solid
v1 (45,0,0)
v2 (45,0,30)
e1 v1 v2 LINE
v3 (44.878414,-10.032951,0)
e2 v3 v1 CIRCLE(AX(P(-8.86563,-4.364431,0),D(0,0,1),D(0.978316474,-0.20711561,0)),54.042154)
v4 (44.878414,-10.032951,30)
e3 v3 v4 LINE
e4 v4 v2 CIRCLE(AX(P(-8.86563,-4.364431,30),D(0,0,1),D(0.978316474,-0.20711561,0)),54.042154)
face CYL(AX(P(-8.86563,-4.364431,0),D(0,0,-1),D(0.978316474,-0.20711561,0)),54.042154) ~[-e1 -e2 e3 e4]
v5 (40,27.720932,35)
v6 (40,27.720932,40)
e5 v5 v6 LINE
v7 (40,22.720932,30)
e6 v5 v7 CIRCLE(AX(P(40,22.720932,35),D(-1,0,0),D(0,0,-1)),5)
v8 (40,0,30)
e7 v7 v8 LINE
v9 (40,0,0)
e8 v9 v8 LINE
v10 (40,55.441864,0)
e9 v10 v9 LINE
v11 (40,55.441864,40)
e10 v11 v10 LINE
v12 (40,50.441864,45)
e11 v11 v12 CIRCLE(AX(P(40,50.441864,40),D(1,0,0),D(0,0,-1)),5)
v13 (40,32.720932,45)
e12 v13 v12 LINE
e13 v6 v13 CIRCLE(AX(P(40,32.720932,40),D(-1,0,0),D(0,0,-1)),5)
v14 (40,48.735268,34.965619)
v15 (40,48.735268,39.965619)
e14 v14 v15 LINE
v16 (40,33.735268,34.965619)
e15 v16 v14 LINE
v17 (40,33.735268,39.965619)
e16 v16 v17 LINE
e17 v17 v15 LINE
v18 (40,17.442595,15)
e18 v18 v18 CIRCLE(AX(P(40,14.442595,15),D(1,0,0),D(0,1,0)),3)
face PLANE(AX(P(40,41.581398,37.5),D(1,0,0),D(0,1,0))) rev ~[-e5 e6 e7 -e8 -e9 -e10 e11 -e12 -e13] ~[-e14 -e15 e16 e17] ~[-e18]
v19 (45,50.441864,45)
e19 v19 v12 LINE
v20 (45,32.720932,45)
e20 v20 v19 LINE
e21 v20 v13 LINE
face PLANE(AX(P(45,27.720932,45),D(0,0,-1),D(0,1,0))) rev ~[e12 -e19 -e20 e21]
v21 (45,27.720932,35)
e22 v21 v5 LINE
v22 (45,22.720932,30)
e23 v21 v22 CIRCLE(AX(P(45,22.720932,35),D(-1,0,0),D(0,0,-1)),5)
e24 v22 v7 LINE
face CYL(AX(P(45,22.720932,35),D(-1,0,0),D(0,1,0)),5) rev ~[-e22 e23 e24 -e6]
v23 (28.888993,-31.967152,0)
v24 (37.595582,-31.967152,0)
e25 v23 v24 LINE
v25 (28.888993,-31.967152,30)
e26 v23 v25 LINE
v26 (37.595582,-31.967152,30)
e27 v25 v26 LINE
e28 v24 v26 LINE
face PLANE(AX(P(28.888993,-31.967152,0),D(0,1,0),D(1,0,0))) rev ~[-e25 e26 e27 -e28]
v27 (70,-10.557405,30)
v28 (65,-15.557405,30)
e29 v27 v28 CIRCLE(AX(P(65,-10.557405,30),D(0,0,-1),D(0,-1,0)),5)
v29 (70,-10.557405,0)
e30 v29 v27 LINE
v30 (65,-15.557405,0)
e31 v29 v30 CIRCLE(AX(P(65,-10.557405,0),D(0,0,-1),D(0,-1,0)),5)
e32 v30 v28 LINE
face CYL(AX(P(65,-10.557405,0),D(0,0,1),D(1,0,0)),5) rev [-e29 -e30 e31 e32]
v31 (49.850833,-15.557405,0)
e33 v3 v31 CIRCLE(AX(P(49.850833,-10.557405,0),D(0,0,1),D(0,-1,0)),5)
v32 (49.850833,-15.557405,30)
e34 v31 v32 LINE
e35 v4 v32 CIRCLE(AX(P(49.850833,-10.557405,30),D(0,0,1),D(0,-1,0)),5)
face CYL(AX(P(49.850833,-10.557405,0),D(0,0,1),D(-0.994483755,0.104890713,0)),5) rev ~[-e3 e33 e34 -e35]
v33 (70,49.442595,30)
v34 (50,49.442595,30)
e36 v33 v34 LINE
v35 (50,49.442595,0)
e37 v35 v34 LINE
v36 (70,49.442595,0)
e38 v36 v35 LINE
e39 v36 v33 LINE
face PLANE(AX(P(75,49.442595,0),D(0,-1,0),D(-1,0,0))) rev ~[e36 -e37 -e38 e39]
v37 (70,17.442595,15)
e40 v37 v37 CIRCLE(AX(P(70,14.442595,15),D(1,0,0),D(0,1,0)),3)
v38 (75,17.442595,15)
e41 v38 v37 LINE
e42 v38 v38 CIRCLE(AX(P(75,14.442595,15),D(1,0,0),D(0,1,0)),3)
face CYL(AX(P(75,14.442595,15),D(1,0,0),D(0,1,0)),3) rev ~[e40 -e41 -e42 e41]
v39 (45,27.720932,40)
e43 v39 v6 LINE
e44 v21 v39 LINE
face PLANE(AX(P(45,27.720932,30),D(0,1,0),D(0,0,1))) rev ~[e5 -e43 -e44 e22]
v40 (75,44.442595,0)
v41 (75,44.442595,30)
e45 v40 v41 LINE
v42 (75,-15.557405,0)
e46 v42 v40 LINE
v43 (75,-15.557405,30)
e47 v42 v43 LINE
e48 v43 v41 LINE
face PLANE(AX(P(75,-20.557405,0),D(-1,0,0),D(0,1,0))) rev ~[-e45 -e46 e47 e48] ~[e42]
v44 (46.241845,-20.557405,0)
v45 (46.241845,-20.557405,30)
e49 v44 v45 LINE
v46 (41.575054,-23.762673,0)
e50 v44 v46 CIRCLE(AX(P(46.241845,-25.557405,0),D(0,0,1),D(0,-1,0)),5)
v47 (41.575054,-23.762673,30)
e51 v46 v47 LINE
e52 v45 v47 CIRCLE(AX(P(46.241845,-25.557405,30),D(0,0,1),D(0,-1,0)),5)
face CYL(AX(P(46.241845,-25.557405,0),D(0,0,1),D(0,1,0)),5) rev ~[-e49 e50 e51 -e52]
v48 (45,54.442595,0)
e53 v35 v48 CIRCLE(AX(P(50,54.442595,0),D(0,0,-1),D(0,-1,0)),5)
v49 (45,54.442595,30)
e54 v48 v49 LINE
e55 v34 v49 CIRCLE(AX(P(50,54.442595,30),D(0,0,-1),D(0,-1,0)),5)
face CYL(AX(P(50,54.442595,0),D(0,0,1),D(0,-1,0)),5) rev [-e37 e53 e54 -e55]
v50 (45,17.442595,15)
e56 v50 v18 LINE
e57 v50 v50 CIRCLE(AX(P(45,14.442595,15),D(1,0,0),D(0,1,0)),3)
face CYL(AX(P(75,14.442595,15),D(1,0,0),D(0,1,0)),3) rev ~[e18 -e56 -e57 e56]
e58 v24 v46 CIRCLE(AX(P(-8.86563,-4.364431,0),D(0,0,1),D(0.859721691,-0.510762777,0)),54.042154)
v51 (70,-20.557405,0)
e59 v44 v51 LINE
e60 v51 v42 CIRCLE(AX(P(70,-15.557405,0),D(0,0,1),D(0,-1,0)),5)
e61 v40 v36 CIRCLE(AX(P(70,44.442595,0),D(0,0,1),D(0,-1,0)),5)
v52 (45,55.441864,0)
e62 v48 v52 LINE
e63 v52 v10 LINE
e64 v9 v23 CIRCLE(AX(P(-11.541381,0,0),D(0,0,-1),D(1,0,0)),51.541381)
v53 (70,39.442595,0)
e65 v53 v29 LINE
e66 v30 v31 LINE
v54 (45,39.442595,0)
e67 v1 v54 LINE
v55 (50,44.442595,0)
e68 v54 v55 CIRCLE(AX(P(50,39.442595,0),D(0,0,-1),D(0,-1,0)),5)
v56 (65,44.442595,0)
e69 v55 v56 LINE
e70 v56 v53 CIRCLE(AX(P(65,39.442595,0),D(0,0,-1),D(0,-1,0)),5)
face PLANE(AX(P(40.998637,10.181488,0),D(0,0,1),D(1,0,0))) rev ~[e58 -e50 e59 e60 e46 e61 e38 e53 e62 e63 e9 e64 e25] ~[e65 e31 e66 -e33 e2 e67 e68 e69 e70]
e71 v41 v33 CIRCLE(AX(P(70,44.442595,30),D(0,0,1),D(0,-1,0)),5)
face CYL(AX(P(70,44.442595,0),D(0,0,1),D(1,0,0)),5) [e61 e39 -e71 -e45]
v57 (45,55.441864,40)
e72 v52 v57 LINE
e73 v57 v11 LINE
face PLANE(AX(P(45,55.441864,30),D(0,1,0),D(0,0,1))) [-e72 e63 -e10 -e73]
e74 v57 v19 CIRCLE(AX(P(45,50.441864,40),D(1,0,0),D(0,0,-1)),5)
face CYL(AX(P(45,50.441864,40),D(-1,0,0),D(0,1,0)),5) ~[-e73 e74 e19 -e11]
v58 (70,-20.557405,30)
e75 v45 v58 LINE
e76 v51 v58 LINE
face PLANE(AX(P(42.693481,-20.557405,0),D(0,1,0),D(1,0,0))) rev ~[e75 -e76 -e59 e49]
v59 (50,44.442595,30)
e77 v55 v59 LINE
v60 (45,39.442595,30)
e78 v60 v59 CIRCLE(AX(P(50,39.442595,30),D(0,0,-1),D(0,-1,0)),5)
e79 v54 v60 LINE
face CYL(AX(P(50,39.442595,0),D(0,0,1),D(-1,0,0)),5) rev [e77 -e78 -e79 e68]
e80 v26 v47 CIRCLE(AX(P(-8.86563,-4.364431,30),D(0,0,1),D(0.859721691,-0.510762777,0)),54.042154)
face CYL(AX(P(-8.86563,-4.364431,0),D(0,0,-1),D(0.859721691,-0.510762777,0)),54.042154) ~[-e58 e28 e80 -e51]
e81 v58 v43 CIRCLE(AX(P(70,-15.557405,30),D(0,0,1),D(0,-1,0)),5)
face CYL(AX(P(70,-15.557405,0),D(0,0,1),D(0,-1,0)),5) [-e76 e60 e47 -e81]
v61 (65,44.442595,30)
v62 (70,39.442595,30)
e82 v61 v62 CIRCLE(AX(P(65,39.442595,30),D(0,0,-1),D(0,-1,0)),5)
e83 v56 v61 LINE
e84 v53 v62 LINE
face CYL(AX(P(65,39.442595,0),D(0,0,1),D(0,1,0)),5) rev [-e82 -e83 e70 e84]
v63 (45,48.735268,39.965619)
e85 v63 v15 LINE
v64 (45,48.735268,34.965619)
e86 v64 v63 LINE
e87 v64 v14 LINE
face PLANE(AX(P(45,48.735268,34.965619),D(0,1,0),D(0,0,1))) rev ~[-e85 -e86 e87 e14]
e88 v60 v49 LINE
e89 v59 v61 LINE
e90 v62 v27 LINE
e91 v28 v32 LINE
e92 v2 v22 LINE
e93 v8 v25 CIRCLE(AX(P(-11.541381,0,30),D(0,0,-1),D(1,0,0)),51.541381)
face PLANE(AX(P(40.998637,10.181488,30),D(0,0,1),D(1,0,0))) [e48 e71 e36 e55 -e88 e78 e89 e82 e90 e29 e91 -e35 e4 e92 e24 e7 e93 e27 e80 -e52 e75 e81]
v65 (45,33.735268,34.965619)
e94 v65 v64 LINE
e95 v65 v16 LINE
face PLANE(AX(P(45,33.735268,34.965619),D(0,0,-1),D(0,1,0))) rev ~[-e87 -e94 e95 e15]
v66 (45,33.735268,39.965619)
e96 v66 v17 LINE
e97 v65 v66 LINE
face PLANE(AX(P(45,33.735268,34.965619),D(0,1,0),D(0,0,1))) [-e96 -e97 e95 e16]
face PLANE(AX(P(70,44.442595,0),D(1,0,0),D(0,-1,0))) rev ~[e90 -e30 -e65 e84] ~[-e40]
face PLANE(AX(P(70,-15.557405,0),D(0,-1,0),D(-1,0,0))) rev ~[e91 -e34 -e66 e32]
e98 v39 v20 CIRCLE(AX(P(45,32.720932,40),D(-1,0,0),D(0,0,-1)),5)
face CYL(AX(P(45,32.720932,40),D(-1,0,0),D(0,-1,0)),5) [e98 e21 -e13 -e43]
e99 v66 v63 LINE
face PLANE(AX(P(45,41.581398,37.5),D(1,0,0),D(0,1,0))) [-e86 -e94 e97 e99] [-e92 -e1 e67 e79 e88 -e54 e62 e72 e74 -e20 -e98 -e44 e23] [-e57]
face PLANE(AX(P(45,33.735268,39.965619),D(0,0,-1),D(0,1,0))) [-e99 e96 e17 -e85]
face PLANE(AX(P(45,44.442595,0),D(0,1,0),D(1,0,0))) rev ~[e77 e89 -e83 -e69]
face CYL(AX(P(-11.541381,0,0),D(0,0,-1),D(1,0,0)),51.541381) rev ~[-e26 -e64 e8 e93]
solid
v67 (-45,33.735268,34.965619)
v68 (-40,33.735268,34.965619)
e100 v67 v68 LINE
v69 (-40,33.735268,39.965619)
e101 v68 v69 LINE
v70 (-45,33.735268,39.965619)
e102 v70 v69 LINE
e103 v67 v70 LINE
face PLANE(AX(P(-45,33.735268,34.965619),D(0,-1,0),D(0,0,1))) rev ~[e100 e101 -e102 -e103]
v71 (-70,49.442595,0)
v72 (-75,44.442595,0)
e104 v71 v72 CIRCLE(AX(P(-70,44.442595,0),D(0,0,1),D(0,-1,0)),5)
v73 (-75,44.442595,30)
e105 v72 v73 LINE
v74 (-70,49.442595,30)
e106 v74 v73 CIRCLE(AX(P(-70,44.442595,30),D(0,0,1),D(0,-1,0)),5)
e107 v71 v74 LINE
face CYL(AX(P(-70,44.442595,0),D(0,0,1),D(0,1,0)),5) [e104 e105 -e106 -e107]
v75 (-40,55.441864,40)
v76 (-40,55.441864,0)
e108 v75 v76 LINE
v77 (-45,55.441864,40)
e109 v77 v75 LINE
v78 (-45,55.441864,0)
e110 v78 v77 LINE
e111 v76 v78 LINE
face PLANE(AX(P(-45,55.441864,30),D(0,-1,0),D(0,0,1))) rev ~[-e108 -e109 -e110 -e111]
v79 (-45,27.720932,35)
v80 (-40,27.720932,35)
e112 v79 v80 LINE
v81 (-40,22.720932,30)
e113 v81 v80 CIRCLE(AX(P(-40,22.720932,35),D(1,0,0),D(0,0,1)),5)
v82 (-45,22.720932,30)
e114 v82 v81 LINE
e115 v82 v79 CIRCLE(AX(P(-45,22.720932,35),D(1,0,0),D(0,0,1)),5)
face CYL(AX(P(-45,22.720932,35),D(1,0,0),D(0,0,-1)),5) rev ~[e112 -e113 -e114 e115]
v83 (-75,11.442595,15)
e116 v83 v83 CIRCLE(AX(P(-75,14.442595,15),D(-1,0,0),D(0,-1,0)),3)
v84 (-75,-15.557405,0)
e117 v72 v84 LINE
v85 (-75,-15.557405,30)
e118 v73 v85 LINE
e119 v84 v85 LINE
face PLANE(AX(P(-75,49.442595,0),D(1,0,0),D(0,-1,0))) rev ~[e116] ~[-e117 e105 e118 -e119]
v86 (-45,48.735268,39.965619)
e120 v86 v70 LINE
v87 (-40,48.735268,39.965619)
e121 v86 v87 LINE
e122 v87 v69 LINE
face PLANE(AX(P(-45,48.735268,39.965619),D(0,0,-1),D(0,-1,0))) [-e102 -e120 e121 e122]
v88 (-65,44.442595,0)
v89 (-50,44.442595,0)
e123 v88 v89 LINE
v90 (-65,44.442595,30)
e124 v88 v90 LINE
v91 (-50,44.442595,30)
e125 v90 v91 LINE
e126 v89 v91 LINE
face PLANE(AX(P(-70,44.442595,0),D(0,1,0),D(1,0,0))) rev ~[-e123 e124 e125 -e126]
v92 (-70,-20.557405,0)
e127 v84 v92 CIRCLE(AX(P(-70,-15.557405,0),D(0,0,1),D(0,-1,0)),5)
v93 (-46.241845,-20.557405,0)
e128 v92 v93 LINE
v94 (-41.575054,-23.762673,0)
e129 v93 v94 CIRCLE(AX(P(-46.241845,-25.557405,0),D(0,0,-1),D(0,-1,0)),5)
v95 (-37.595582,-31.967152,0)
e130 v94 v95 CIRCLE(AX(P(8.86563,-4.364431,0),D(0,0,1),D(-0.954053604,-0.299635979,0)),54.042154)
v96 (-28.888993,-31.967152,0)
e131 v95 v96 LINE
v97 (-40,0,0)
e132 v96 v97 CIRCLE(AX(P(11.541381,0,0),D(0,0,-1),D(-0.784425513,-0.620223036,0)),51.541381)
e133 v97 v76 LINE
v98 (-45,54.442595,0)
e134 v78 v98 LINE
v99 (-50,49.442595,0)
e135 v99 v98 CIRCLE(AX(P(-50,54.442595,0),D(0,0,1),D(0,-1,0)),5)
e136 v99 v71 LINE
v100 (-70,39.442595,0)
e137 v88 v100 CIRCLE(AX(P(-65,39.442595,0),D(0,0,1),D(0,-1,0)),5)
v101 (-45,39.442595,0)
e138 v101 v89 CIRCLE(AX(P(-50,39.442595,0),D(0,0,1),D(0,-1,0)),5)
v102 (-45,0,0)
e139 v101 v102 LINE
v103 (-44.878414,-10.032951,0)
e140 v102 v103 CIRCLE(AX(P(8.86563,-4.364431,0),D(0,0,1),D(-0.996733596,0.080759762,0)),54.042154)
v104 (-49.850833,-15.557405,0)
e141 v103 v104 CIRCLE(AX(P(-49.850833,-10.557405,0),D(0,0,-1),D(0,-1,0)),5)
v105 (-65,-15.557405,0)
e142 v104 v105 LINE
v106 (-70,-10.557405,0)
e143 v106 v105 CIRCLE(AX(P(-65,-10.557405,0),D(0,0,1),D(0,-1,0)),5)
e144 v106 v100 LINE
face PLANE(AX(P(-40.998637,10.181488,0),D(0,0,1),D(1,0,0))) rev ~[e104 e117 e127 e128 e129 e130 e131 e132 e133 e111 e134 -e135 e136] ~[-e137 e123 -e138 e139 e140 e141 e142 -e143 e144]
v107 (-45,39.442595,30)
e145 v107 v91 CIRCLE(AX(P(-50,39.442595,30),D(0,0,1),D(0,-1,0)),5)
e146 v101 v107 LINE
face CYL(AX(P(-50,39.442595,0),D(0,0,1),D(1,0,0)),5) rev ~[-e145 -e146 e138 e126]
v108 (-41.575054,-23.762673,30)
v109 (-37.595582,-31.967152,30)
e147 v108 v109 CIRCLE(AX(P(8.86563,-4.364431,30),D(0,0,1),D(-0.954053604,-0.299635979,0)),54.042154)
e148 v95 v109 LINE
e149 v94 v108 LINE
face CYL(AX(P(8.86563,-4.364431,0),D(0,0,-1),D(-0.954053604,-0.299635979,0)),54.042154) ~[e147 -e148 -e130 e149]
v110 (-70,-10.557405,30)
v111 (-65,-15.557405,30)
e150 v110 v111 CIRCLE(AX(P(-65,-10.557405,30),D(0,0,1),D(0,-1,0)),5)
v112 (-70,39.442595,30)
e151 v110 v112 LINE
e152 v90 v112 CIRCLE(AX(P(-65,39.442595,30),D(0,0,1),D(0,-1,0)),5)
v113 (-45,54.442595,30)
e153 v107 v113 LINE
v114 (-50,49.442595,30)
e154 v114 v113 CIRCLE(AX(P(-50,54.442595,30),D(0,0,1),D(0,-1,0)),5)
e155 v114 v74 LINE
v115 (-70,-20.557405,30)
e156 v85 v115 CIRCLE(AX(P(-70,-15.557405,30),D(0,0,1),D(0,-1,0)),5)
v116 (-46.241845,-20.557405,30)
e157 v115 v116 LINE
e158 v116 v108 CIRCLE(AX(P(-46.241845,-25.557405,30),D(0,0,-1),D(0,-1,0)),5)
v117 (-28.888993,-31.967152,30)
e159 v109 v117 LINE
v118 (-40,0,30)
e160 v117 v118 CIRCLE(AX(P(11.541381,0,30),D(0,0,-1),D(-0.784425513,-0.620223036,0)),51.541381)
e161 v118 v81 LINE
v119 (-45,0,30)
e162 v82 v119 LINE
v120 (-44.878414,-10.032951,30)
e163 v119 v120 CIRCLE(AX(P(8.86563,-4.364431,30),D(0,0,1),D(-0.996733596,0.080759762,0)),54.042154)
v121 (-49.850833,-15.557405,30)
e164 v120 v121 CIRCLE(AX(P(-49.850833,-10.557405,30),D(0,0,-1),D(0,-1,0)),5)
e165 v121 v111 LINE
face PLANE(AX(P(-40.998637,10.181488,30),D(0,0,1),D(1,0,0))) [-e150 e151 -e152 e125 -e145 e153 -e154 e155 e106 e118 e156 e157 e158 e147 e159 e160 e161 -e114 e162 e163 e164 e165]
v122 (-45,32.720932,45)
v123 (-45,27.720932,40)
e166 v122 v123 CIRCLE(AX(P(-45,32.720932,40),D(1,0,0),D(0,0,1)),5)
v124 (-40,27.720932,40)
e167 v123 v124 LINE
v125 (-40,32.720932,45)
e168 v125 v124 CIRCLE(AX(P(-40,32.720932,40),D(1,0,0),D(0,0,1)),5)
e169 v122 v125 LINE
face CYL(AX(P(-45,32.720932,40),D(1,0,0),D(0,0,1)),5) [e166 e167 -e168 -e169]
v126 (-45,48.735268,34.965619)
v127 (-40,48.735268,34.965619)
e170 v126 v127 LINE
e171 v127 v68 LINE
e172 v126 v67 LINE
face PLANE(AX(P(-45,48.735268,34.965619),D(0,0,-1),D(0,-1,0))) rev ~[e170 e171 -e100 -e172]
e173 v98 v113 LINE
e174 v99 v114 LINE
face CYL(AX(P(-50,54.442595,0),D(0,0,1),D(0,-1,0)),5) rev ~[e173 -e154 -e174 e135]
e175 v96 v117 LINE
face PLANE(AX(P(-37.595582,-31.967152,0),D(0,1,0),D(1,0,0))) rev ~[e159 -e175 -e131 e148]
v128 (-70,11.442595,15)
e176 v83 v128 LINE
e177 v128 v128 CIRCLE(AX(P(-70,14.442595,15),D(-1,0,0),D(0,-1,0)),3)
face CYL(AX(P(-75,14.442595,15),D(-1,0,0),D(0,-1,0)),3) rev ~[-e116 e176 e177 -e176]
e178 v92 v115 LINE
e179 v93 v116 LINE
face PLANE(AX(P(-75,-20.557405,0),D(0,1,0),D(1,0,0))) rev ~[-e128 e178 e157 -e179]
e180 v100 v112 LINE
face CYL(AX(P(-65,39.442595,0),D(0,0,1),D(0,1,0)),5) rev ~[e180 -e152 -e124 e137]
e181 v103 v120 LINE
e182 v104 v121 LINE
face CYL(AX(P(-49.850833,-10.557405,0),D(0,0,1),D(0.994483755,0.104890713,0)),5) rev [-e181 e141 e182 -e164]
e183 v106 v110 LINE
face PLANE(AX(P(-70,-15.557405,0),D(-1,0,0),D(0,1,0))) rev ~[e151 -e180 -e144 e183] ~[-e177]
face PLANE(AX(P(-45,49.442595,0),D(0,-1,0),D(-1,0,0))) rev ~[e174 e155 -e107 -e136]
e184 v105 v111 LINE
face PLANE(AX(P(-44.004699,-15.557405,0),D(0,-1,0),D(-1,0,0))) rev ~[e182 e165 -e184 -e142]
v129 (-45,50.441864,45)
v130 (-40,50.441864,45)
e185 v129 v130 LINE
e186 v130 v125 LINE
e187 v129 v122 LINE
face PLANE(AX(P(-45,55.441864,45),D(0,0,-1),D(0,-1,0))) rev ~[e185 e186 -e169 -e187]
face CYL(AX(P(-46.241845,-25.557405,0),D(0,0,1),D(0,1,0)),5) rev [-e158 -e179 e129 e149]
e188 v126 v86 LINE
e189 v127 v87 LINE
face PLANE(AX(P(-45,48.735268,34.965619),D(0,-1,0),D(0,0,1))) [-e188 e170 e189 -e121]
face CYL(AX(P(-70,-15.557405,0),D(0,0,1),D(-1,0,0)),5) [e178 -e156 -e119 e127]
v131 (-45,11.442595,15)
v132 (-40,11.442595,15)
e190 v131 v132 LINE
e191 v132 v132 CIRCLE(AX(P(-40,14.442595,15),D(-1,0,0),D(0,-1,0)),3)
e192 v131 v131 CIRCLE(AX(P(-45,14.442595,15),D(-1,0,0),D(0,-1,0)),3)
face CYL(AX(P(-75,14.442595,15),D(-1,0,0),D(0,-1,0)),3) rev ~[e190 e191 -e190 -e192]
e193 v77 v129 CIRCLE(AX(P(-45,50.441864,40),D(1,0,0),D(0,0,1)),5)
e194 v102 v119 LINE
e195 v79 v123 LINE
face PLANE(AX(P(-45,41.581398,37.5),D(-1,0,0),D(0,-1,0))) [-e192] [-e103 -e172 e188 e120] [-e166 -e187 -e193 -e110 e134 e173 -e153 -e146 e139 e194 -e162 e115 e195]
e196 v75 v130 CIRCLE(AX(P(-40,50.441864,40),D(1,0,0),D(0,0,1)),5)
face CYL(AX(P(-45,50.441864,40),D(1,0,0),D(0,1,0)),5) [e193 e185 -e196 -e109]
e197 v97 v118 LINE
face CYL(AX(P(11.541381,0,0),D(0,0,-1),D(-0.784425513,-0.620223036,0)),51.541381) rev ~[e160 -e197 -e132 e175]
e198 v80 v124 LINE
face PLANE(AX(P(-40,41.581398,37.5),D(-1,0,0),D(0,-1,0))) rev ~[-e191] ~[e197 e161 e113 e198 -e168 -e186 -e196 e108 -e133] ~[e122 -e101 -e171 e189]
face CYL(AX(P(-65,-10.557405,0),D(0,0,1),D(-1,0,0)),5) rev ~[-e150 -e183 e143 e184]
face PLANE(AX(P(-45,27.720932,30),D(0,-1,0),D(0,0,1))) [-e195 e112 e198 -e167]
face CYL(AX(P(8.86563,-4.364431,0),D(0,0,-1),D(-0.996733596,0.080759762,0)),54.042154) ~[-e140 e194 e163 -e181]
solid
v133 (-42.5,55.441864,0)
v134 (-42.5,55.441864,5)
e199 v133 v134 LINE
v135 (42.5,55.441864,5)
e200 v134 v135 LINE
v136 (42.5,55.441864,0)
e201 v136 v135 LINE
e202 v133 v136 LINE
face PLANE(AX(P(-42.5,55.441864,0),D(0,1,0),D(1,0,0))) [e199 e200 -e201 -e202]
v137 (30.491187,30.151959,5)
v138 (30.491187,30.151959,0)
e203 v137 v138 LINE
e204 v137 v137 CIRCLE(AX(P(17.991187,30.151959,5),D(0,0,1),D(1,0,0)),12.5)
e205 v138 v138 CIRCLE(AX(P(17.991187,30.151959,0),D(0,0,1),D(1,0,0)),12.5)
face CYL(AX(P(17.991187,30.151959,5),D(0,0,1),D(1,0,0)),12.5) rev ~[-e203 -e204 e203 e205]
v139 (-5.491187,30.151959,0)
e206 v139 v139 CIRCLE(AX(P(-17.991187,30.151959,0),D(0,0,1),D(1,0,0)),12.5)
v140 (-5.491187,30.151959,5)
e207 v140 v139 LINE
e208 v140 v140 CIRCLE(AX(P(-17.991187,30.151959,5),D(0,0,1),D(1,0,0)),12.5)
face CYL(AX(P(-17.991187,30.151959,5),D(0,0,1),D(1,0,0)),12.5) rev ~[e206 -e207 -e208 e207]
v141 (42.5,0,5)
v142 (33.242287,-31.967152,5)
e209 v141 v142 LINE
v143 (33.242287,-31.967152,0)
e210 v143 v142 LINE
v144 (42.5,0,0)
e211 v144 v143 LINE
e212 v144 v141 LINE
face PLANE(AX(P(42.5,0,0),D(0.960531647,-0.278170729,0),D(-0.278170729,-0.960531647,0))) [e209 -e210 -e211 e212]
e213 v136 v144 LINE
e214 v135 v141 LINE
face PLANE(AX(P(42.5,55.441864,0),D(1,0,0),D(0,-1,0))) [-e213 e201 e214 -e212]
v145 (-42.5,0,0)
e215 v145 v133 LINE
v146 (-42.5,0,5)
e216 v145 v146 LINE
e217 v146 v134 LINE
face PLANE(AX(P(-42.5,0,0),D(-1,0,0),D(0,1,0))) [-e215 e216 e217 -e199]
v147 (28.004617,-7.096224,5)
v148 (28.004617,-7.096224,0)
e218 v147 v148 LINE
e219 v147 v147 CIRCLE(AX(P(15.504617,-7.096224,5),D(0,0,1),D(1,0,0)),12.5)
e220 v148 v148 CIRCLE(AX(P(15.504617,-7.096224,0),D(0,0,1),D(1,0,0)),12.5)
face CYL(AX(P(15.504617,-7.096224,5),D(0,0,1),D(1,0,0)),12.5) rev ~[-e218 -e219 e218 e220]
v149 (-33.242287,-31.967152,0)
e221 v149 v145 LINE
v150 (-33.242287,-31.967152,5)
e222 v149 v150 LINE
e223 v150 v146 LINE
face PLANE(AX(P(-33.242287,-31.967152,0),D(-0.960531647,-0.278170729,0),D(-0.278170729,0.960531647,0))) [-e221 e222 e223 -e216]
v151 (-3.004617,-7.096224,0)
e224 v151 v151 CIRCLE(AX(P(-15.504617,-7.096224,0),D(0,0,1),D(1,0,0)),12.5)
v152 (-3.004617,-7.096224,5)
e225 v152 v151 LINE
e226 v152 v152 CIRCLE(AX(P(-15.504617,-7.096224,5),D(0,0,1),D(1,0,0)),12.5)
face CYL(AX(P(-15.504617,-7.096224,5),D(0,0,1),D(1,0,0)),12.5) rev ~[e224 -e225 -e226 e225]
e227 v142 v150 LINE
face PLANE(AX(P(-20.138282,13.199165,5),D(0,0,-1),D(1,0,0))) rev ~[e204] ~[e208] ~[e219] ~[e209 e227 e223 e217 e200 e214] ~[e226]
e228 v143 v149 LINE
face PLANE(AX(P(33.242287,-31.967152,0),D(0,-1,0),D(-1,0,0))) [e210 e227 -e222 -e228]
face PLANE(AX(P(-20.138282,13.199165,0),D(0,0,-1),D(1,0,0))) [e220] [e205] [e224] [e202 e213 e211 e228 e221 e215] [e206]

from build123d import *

# Parameters (mm, degrees)
F1_DEPTH  = 30
F3_DEPTH  = 5
F4_R      = 3
F5_DEPTH  = 35
F6_R      = 3
F7_DEPTH  = 35
F9_W      = 27.7209319142
F9_H      = 15
F9_W_2    = 15
F9_H_2    = 5
F10_DEPTH = 5
F11_R     = 5
F12_R     = 5
F13_R     = 5
F13_2_R   = 5
F14_R     = 5
F15_W     = 27.7209319142
F15_H     = 15
F15_W_2   = 15
F15_H_2   = 5
F16_DEPTH = 5
F17_R     = 5
F18_R     = 12.5
F19_DEPTH = 5


with BuildPart() as f1:
    # F0 (on Top) → F1 (new body)
    with BuildSketch(Plane.XY):
        with BuildLine():
            Line((-45, 44.4425949542), (-45, 0))
            ThreePointArc((-45, 0), (-45.066266446, -7.8147796829), (-44.0046991035, -15.5574050458))
            ThreePointArc((-44.0046991035, -15.5574050458), (-43.4089049923, -18.0730910814), (-42.6934813561, -20.5574050458))
            ThreePointArc((-42.6934813561, -20.5574050458), (-40.475443237, -26.4101305765), (-37.5955815851, -31.9671519101))
            Line((-37.5955815851, -31.9671519101), (-28.8889932035, -31.9671519101))
            ThreePointArc((-28.8889932035, -31.9671519101), (-37.1430686541, -16.9215341597), (-40, 0))
            Line((-40, 0), (-40, 55.4418638284))
            Line((-40, 55.4418638284), (-45, 55.4418638284))
            Line((-45, 55.4418638284), (-45, 49.4425949542))
            Line((-45, 49.4425949542), (-45, 44.4425949542))
        make_face()
        with BuildLine():
            ThreePointArc((-42.6934813561, -20.5574050458), (-43.4089049923, -18.0730910814), (-44.0046991035, -15.5574050458))
            Line((-44.0046991035, -15.5574050458), (-70, -15.5574050458))
            Line((-70, -15.5574050458), (-70, 44.4425949542))
            Line((-70, 44.4425949542), (-45, 44.4425949542))
            Line((-45, 44.4425949542), (-45, 49.4425949542))
            Line((-45, 49.4425949542), (-75, 49.4425949542))
            Line((-75, 49.4425949542), (-75, -20.5574050458))
            Line((-75, -20.5574050458), (-42.6934813561, -20.5574050458))
        make_face()
    extrude(amount=F1_DEPTH)

    # F6 (on face) → F7 (cut)
    with BuildSketch(Plane(origin=(-75, 0, 0), x_dir=(0, -1, 0), z_dir=(-1, 0, 0))):
        with Locations((-14.4425949542, 15)):
            Circle(F6_R)
    extrude(amount=-F7_DEPTH, mode=Mode.SUBTRACT)

    # F9 (on face) → F10 (join)
    with BuildSketch(Plane(origin=(-45, 0, 0), x_dir=(0, -1, 0), z_dir=(-1, 0, 0))):
        with Locations((-41.5813978713, 37.5)):
            Rectangle(F9_W, F9_H)
        with Locations((-41.235268414, 37.4656194448)):
            Rectangle(F9_W_2, F9_H_2, mode=Mode.SUBTRACT)
    extrude(amount=-F10_DEPTH)

    # F11
    f11_edges = [f1.edges().sort_by_distance(p)[0] for p in [
        (-75, 49.442595, 15),
        (-75, -20.557405, 15),
    ]]
    fillet(f11_edges, radius=F11_R)

    # F13
    f13_edges = [f1.edges().sort_by_distance(p)[0] for p in [
        (-70, 44.442595, 15),
        (-70, -15.557405, 15),
        (-45, 44.442595, 15),
        (-44.004699, -15.557405, 15),
        (-42.693481, -20.557405, 15),
        (-45, 49.442595, 15),
        (-42.5, 27.720932, 30),
    ]]
    fillet(f13_edges, radius=F13_R)

    # F14
    f14_edges = [f1.edges().sort_by_distance(p)[0] for p in [
        (-42.5, 55.441864, 45),
        (-42.5, 27.720932, 45),
    ]]
    fillet(f14_edges, radius=F14_R)


with BuildPart() as f1b:
    # F0 (on Top) → F1, piece 2 (new body)
    with BuildSketch(Plane.XY):
        with BuildLine():
            ThreePointArc((44.0046991035, -15.5574050458), (45.066266446, -7.8147796829), (45, 0))
            Line((45, 0), (45, 44.4425949542))
            Line((45, 44.4425949542), (45, 49.4425949542))
            Line((45, 49.4425949542), (45, 55.4418638284))
            Line((45, 55.4418638284), (40, 55.4418638284))
            Line((40, 55.4418638284), (40, 0))
            ThreePointArc((40, 0), (37.1430686541, -16.9215341597), (28.8889932035, -31.9671519101))
            Line((28.8889932035, -31.9671519101), (37.5955815851, -31.9671519101))
            ThreePointArc((37.5955815851, -31.9671519101), (40.475443237, -26.4101305765), (42.6934813561, -20.5574050458))
            ThreePointArc((42.6934813561, -20.5574050458), (43.4089049923, -18.0730910814), (44.0046991035, -15.5574050458))
        make_face()
        with BuildLine():
            Line((45, 49.4425949542), (45, 44.4425949542))
            Line((45, 44.4425949542), (70, 44.4425949542))
            Line((70, 44.4425949542), (70, -15.5574050458))
            Line((70, -15.5574050458), (44.0046991035, -15.5574050458))
            ThreePointArc((44.0046991035, -15.5574050458), (43.4089049923, -18.0730910814), (42.6934813561, -20.5574050458))
            Line((42.6934813561, -20.5574050458), (75, -20.5574050458))
            Line((75, -20.5574050458), (75, 49.4425949542))
            Line((75, 49.4425949542), (45, 49.4425949542))
        make_face()
    extrude(amount=F1_DEPTH)

    # F4 (on face) → F5 (cut)
    with BuildSketch(Plane.YZ.offset(75)):
        with Locations((14.4425949542, 15)):
            Circle(F4_R)
    extrude(amount=-F5_DEPTH, mode=Mode.SUBTRACT)

    # F12
    f12_edges = [f1b.edges().sort_by_distance(p)[0] for p in [
        (75, -20.557405, 15),
        (75, 49.442595, 15),
    ]]
    fillet(f12_edges, radius=F12_R)

    # F13#2
    f13_2_edges = [f1b.edges().sort_by_distance(p)[0] for p in [
        (70, 44.442595, 15),
        (70, -15.557405, 15),
        (45, 44.442595, 15),
        (44.004699, -15.557405, 15),
        (42.693481, -20.557405, 15),
        (45, 49.442595, 15),
    ]]
    fillet(f13_2_edges, radius=F13_2_R)

    # F15 (on face) → F16 (join)
    with BuildSketch(Plane.YZ.offset(45)):
        with Locations((41.5813978713, 37.5)):
            Rectangle(F15_W, F15_H)
        with Locations((41.235268414, 37.4656194448)):
            Rectangle(F15_W_2, F15_H_2, mode=Mode.SUBTRACT)
    extrude(amount=-F16_DEPTH)

    # F17
    f17_edges = [f1b.edges().sort_by_distance(p)[0] for p in [
        (42.5, 55.441864, 45),
        (42.5, 27.720932, 45),
        (42.5, 27.720932, 30),
    ]]
    fillet(f17_edges, radius=F17_R)


with BuildPart() as f3:
    # F2 (on face) → F3 (new body)
    with BuildSketch(Plane(origin=(0, 0, 0), x_dir=(1, 0, 0), z_dir=(0, 0, -1))):
        Polygon((-42.5, 0), (-42.5, -55.4418638284), (0, -55.4418638284), (0, 31.9671519101), (-33.2422873943, 31.9671519101), align=None)
        Polygon((0, 31.9671519101), (0, -55.4418638284), (42.5, -55.4418638284), (42.5, 0), (33.2422873943, 31.9671519101), align=None)
    extrude(amount=-F3_DEPTH)

    # F18 (on face) → F19 (cut)
    with BuildSketch(Plane.XY.offset(5)):
        with Locations((-17.9911866391, 30.1519593033)):
            Circle(F18_R)
        with Locations((-15.5046174286, -7.0962243824)):
            Circle(F18_R)
        with Locations((17.9911866391, 30.1519593033)):
            Circle(F18_R)
        with Locations((15.5046174286, -7.0962243824)):
            Circle(F18_R)
    extrude(amount=-F19_DEPTH, mode=Mode.SUBTRACT)


solid = Compound([f1.part, f1b.part, f3.part])
